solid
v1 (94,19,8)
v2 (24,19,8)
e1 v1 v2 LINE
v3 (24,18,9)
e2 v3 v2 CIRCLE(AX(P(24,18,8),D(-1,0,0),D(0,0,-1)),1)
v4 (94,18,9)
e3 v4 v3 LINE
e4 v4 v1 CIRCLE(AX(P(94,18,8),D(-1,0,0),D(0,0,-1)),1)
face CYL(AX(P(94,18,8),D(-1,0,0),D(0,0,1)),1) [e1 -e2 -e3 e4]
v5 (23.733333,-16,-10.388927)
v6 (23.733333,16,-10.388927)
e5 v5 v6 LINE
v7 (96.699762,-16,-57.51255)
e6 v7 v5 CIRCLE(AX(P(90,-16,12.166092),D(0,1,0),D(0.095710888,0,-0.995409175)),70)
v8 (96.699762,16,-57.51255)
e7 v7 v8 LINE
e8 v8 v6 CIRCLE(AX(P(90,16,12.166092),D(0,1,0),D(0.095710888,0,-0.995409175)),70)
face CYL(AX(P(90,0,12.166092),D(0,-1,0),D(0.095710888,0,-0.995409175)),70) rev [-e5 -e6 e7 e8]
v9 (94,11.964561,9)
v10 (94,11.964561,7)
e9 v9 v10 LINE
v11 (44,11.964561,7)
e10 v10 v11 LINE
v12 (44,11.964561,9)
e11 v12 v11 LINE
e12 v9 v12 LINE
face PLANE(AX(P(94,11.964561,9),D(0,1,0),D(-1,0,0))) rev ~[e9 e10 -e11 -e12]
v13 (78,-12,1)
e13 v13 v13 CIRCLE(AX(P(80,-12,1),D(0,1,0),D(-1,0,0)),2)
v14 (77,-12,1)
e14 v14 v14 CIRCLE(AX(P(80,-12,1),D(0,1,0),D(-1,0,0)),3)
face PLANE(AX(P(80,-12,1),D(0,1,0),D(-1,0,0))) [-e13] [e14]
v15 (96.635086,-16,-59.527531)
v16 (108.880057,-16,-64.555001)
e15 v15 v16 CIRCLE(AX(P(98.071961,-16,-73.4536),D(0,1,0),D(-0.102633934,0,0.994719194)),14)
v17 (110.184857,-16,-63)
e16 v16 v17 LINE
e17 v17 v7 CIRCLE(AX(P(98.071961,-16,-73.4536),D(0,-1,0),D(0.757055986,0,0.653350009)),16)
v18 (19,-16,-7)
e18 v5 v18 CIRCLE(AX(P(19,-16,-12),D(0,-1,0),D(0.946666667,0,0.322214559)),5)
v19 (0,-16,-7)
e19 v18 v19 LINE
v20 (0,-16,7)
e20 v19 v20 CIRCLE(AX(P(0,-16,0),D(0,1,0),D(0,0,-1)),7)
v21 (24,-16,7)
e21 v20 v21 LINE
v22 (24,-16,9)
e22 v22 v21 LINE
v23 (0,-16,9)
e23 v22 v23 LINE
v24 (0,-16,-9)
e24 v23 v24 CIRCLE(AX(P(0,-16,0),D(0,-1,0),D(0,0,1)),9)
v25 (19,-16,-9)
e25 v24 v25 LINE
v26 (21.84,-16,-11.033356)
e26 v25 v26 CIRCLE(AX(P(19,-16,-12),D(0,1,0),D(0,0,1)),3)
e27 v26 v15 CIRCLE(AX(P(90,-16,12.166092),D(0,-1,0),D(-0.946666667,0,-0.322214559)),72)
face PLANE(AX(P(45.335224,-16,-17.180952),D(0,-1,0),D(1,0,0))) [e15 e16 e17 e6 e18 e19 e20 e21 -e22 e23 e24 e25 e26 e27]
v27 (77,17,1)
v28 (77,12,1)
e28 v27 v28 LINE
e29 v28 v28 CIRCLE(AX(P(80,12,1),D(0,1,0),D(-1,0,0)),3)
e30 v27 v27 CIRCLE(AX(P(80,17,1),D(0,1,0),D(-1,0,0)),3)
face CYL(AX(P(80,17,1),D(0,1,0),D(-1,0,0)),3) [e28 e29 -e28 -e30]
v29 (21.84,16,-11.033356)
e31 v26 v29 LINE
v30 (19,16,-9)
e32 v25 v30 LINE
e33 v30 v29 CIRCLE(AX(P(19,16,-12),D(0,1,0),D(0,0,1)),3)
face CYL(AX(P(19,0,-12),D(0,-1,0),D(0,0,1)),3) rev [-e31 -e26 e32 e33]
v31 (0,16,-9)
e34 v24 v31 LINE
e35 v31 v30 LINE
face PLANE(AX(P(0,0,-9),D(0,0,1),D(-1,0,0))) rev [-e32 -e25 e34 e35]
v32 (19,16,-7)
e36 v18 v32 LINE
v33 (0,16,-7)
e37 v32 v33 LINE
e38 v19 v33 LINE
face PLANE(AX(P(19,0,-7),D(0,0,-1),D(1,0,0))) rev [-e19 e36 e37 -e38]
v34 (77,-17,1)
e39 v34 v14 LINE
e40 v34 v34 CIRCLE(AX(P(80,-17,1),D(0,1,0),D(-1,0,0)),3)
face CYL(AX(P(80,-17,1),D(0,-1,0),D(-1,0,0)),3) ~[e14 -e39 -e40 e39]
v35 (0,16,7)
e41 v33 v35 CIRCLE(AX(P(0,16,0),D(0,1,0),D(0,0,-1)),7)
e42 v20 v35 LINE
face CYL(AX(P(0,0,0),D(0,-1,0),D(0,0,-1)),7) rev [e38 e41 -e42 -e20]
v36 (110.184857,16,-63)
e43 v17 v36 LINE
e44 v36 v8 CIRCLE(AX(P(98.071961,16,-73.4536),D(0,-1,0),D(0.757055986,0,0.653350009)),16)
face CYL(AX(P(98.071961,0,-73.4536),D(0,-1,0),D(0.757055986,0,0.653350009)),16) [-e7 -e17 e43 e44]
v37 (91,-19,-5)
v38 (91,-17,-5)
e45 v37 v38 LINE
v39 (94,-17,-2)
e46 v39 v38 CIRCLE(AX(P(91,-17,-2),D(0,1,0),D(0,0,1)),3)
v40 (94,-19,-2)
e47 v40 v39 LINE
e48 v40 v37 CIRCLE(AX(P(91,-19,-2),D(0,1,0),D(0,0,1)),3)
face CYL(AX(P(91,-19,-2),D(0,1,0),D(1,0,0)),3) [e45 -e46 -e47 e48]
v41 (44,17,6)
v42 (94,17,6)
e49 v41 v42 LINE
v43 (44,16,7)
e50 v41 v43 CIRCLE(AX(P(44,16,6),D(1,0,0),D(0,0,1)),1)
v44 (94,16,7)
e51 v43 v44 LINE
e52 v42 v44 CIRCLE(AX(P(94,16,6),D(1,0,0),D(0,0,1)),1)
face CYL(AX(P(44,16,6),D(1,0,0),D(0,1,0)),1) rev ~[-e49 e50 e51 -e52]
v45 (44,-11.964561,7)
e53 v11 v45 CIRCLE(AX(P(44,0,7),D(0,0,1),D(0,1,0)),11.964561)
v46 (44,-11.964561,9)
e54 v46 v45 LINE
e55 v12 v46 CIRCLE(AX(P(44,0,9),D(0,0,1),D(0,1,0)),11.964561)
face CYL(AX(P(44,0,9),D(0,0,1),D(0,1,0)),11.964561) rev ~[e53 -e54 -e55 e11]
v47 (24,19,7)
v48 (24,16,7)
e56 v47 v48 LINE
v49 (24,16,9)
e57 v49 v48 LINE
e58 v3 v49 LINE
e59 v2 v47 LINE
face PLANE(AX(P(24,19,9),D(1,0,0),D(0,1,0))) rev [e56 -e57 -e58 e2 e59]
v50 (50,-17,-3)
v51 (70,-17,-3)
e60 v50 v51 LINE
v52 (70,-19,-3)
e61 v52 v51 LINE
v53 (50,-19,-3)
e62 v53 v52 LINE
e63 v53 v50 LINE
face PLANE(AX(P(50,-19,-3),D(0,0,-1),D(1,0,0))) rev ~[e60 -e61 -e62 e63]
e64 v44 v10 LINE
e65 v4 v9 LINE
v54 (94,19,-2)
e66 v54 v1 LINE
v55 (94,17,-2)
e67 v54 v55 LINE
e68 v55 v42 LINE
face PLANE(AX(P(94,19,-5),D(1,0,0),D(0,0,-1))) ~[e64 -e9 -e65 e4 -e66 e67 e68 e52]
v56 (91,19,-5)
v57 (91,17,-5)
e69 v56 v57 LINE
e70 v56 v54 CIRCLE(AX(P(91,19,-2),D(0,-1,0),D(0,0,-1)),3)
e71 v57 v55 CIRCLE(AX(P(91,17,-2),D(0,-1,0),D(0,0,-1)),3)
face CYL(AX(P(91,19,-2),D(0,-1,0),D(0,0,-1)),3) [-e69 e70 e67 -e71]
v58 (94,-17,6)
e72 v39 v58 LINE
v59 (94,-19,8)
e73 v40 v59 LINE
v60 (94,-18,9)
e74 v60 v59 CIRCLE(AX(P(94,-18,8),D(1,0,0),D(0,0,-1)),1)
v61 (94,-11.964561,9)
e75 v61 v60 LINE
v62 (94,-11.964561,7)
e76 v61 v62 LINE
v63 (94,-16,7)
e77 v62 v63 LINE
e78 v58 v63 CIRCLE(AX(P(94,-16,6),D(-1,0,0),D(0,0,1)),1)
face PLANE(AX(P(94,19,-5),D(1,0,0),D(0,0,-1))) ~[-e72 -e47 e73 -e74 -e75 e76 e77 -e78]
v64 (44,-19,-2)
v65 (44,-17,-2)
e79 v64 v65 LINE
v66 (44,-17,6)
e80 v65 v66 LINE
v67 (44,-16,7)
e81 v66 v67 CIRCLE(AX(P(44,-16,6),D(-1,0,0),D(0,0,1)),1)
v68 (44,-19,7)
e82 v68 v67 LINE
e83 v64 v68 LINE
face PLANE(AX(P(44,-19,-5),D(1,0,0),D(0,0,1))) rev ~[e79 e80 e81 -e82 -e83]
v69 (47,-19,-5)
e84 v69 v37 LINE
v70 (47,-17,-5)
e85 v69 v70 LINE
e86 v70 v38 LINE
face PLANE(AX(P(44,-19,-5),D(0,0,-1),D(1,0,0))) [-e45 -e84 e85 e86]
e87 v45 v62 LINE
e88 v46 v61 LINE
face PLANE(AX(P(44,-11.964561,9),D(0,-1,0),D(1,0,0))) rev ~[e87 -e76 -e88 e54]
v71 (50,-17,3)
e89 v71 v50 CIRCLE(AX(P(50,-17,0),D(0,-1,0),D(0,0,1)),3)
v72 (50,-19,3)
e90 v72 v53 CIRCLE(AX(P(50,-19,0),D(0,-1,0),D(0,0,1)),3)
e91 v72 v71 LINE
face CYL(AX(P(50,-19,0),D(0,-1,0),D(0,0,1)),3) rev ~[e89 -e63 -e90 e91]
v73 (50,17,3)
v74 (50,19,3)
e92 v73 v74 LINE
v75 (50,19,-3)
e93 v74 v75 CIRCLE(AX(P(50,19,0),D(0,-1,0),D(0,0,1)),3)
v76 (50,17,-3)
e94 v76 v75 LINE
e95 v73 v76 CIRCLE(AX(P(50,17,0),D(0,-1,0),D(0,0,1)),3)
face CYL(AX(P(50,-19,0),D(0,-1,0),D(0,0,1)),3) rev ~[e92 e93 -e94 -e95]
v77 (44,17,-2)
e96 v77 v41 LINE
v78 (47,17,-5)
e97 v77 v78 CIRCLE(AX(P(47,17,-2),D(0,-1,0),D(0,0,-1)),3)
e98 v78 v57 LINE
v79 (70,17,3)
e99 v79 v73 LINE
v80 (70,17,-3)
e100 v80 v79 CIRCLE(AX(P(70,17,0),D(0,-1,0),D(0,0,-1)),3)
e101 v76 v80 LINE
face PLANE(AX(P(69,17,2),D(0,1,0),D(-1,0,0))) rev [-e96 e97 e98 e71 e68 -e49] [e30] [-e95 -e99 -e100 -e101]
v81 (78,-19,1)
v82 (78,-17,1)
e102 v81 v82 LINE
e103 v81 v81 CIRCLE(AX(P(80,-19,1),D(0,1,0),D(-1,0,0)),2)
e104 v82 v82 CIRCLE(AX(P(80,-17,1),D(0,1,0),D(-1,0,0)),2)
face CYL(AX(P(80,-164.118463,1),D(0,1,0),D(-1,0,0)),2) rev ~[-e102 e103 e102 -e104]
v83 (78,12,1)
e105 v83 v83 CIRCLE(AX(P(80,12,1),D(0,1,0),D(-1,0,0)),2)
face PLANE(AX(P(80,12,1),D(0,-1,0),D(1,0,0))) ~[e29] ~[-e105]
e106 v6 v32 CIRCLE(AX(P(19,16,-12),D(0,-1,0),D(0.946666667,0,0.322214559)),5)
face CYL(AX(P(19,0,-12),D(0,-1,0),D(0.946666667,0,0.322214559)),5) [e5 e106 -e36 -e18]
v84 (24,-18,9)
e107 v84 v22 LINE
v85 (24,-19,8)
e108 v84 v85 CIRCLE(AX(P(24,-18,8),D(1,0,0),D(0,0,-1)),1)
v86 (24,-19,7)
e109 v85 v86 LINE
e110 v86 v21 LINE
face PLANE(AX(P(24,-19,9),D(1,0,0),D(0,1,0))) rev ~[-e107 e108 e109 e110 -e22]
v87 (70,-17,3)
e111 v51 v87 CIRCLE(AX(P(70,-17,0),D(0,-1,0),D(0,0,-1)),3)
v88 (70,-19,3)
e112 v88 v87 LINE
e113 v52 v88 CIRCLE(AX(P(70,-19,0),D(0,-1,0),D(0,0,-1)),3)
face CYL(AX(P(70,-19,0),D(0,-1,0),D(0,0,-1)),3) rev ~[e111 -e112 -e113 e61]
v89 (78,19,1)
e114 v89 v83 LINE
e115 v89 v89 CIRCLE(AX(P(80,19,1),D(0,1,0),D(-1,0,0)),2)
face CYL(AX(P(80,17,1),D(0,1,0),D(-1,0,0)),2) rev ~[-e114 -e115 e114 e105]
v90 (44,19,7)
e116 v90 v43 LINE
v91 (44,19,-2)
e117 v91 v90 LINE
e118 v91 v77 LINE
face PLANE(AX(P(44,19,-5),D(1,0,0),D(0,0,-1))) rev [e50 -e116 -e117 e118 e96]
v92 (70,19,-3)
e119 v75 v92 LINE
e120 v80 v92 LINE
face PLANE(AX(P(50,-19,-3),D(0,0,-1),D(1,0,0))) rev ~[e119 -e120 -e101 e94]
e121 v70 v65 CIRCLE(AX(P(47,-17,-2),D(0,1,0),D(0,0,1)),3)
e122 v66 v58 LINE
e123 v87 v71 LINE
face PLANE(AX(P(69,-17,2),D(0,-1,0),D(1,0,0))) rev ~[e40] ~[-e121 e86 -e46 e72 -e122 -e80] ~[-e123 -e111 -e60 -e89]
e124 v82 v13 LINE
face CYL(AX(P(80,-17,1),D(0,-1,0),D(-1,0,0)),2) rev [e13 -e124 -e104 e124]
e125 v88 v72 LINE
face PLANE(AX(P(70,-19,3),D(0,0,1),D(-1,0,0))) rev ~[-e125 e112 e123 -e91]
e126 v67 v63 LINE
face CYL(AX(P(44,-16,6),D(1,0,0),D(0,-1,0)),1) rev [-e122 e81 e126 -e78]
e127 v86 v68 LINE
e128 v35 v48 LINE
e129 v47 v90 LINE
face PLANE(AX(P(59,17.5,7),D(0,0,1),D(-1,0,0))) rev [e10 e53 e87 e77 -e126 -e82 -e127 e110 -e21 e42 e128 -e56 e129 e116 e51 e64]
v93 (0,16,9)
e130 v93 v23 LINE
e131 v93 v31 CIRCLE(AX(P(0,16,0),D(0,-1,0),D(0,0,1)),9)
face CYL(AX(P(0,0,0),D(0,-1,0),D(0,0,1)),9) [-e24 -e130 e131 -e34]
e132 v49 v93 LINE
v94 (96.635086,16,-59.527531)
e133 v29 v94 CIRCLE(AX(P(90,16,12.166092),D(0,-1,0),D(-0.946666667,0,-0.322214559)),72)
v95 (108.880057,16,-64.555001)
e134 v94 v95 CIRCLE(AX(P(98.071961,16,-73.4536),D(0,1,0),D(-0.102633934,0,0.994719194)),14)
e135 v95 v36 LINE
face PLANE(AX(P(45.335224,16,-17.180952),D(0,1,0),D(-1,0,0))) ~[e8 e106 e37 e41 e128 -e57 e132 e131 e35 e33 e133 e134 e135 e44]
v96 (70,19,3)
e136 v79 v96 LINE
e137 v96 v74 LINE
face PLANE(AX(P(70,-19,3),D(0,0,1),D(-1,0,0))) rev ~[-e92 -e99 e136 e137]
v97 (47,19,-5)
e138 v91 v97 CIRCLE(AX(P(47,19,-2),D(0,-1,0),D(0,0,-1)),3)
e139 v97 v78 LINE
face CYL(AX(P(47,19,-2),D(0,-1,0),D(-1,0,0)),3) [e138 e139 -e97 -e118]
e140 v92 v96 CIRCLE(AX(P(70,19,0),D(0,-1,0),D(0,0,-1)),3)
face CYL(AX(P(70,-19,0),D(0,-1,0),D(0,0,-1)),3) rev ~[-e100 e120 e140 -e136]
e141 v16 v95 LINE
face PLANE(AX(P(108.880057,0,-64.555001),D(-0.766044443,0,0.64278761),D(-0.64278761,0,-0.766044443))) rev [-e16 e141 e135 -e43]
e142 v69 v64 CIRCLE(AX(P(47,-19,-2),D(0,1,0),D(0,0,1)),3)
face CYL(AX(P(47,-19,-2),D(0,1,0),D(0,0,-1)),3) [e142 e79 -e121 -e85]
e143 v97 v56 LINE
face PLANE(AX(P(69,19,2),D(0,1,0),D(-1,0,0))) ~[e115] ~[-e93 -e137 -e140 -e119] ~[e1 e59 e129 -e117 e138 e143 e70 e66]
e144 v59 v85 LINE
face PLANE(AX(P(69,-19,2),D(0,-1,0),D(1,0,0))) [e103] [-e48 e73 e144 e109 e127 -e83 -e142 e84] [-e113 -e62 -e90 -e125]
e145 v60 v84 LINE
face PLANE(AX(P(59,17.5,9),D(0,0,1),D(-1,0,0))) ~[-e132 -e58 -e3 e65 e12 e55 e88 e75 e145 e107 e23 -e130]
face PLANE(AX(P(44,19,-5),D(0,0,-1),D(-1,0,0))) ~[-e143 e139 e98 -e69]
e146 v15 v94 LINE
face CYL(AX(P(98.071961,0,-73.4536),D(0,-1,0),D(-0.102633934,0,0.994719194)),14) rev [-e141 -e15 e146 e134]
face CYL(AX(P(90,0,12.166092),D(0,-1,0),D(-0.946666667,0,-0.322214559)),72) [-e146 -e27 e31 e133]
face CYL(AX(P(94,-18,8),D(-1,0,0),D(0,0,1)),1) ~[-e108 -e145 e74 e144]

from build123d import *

# Parameters (mm, degrees)
F1_DEPTH  = 16
F2_W      = 70
F2_H      = 3
F3_DEPTH  = 2
F4_W      = 50
F4_H      = 14
F5_DEPTH  = 2
F6_R      = 1
F9_DEPTH  = 2
F11_DEPTH = 38.001
F13_D     = 4
F14_R     = 3
F14_R_2   = 2
F15_DEPTH = 5
F16_R     = 3


# Not quite as in the source:
# - a pattern or mirror of a feature is missing from the dataset's text; its kind, count and spacing are read off the source's solid


with BuildPart() as f1:
    # F0 (on Front) → F1 (new body)
    with BuildSketch(Plane.XZ):
        with BuildLine():
            Line((94, 9), (0, 9))
            ThreePointArc((0, 9), (-9, 0), (0, -9))
            Line((0, -9), (19, -9))
            ThreePointArc((19, -9), (20.7464347921, -9.5607448848), (21.84, -11.0333563221))
            ThreePointArc((21.84, -11.0333563221), (50.8304964021, -48.2470687705), (96.6350861079, -59.5275314258))
            ThreePointArc((96.6350861079, -59.5275314258), (103.3892729035, -60.5026852737), (108.8800565509, -64.5550005668))
            Line((108.8800565509, -64.5550005668), (110.184856953, -63))
            ThreePointArc((110.184856953, -63), (104.1026052212, -58.6336361635), (96.6997621323, -57.5125503141))
            ThreePointArc((96.6997621323, -57.5125503141), (52.0235205329, -46.636858721), (23.7333333333, -10.3889272035))
            ThreePointArc((23.7333333333, -10.3889272035), (21.9107246536, -7.9345748081), (19, -7))
            Line((19, -7), (0, -7))
            ThreePointArc((0, -7), (-7, 0), (0, 7))
            Line((0, 7), (94, 7))
            Line((94, 7), (94, 9))
        make_face()
    extrude(amount=F1_DEPTH)

    # F2 (on face) → F3 (join)
    with BuildSketch(Plane.XY.offset(9)):
        with Locations((59, -17.5)):
            Rectangle(F2_W, F2_H)
    extrude(amount=-F3_DEPTH)

    # F4 (on face) → F5 (join)
    with BuildSketch(Plane.XZ.offset(19)):
        with Locations((69, 2)):
            Rectangle(F4_W, F4_H)
    extrude(amount=-F5_DEPTH)

    # F6
    f6_edges = [f1.edges().sort_by_distance(p)[0] for p in [
        (59, -19, 9),
        (69, -17, 7),
    ]]
    fillet(f6_edges, radius=F6_R)

    # F7: F1 across plane


with BuildPart() as f1_1:
    add(f1.part)
    add(f1.part.mirror(Plane.XZ))

    # F8 (on face) → F9 (cut)
    with BuildSketch(Plane.XY.offset(9)):
        with BuildLine():
            Line((94, 11.9645609066), (44, 11.9645609066))
            ThreePointArc((44, 11.9645609066), (32.0354390934, 0), (44, -11.9645609066))
            Line((44, -11.9645609066), (94, -11.9645609066))
            Line((94, -11.9645609066), (94, 11.9645609066))
        make_face()
    extrude(amount=-F9_DEPTH, mode=Mode.SUBTRACT)

    # F10 (on face) → F11 (cut, through all)
    with BuildSketch(Plane.XZ.offset(19)):
        with BuildLine():
            ThreePointArc((50, 3), (47, 0), (50, -3))
            Line((50, -3), (70, -3))
            ThreePointArc((70, -3), (73, 0), (70, 3))
            Line((70, 3), (50, 3))
        make_face()
    extrude(amount=-F11_DEPTH, mode=Mode.SUBTRACT)

    # F13 (through all)
    with Locations(Plane.XZ.offset(19)):
        with Locations((80, 1)):
            Hole(F13_D / 2)

    # F14 (on face) → F15 (join)
    with BuildSketch(Plane(origin=(0, -17, 0), x_dir=(-1, 0, 0), z_dir=(0, 1, 0))):
        with Locations((-80, 1)):
            Circle(F14_R)
        with Locations((-80, 1)):
            Circle(F14_R_2, mode=Mode.SUBTRACT)
    f15 = extrude(amount=F15_DEPTH)

    # F15_copies: F15 across plane
    add(f15.mirror(Plane.ZX))

    # F16
    f16_edges = [f1_1.edges().sort_by_distance(p)[0] for p in [
        (94, 18, -5),
        (94, -18, -5),
        (44, -18, -5),
        (44, 18, -5),
    ]]
    fillet(f16_edges, radius=F16_R)


solid = f1_1.part
